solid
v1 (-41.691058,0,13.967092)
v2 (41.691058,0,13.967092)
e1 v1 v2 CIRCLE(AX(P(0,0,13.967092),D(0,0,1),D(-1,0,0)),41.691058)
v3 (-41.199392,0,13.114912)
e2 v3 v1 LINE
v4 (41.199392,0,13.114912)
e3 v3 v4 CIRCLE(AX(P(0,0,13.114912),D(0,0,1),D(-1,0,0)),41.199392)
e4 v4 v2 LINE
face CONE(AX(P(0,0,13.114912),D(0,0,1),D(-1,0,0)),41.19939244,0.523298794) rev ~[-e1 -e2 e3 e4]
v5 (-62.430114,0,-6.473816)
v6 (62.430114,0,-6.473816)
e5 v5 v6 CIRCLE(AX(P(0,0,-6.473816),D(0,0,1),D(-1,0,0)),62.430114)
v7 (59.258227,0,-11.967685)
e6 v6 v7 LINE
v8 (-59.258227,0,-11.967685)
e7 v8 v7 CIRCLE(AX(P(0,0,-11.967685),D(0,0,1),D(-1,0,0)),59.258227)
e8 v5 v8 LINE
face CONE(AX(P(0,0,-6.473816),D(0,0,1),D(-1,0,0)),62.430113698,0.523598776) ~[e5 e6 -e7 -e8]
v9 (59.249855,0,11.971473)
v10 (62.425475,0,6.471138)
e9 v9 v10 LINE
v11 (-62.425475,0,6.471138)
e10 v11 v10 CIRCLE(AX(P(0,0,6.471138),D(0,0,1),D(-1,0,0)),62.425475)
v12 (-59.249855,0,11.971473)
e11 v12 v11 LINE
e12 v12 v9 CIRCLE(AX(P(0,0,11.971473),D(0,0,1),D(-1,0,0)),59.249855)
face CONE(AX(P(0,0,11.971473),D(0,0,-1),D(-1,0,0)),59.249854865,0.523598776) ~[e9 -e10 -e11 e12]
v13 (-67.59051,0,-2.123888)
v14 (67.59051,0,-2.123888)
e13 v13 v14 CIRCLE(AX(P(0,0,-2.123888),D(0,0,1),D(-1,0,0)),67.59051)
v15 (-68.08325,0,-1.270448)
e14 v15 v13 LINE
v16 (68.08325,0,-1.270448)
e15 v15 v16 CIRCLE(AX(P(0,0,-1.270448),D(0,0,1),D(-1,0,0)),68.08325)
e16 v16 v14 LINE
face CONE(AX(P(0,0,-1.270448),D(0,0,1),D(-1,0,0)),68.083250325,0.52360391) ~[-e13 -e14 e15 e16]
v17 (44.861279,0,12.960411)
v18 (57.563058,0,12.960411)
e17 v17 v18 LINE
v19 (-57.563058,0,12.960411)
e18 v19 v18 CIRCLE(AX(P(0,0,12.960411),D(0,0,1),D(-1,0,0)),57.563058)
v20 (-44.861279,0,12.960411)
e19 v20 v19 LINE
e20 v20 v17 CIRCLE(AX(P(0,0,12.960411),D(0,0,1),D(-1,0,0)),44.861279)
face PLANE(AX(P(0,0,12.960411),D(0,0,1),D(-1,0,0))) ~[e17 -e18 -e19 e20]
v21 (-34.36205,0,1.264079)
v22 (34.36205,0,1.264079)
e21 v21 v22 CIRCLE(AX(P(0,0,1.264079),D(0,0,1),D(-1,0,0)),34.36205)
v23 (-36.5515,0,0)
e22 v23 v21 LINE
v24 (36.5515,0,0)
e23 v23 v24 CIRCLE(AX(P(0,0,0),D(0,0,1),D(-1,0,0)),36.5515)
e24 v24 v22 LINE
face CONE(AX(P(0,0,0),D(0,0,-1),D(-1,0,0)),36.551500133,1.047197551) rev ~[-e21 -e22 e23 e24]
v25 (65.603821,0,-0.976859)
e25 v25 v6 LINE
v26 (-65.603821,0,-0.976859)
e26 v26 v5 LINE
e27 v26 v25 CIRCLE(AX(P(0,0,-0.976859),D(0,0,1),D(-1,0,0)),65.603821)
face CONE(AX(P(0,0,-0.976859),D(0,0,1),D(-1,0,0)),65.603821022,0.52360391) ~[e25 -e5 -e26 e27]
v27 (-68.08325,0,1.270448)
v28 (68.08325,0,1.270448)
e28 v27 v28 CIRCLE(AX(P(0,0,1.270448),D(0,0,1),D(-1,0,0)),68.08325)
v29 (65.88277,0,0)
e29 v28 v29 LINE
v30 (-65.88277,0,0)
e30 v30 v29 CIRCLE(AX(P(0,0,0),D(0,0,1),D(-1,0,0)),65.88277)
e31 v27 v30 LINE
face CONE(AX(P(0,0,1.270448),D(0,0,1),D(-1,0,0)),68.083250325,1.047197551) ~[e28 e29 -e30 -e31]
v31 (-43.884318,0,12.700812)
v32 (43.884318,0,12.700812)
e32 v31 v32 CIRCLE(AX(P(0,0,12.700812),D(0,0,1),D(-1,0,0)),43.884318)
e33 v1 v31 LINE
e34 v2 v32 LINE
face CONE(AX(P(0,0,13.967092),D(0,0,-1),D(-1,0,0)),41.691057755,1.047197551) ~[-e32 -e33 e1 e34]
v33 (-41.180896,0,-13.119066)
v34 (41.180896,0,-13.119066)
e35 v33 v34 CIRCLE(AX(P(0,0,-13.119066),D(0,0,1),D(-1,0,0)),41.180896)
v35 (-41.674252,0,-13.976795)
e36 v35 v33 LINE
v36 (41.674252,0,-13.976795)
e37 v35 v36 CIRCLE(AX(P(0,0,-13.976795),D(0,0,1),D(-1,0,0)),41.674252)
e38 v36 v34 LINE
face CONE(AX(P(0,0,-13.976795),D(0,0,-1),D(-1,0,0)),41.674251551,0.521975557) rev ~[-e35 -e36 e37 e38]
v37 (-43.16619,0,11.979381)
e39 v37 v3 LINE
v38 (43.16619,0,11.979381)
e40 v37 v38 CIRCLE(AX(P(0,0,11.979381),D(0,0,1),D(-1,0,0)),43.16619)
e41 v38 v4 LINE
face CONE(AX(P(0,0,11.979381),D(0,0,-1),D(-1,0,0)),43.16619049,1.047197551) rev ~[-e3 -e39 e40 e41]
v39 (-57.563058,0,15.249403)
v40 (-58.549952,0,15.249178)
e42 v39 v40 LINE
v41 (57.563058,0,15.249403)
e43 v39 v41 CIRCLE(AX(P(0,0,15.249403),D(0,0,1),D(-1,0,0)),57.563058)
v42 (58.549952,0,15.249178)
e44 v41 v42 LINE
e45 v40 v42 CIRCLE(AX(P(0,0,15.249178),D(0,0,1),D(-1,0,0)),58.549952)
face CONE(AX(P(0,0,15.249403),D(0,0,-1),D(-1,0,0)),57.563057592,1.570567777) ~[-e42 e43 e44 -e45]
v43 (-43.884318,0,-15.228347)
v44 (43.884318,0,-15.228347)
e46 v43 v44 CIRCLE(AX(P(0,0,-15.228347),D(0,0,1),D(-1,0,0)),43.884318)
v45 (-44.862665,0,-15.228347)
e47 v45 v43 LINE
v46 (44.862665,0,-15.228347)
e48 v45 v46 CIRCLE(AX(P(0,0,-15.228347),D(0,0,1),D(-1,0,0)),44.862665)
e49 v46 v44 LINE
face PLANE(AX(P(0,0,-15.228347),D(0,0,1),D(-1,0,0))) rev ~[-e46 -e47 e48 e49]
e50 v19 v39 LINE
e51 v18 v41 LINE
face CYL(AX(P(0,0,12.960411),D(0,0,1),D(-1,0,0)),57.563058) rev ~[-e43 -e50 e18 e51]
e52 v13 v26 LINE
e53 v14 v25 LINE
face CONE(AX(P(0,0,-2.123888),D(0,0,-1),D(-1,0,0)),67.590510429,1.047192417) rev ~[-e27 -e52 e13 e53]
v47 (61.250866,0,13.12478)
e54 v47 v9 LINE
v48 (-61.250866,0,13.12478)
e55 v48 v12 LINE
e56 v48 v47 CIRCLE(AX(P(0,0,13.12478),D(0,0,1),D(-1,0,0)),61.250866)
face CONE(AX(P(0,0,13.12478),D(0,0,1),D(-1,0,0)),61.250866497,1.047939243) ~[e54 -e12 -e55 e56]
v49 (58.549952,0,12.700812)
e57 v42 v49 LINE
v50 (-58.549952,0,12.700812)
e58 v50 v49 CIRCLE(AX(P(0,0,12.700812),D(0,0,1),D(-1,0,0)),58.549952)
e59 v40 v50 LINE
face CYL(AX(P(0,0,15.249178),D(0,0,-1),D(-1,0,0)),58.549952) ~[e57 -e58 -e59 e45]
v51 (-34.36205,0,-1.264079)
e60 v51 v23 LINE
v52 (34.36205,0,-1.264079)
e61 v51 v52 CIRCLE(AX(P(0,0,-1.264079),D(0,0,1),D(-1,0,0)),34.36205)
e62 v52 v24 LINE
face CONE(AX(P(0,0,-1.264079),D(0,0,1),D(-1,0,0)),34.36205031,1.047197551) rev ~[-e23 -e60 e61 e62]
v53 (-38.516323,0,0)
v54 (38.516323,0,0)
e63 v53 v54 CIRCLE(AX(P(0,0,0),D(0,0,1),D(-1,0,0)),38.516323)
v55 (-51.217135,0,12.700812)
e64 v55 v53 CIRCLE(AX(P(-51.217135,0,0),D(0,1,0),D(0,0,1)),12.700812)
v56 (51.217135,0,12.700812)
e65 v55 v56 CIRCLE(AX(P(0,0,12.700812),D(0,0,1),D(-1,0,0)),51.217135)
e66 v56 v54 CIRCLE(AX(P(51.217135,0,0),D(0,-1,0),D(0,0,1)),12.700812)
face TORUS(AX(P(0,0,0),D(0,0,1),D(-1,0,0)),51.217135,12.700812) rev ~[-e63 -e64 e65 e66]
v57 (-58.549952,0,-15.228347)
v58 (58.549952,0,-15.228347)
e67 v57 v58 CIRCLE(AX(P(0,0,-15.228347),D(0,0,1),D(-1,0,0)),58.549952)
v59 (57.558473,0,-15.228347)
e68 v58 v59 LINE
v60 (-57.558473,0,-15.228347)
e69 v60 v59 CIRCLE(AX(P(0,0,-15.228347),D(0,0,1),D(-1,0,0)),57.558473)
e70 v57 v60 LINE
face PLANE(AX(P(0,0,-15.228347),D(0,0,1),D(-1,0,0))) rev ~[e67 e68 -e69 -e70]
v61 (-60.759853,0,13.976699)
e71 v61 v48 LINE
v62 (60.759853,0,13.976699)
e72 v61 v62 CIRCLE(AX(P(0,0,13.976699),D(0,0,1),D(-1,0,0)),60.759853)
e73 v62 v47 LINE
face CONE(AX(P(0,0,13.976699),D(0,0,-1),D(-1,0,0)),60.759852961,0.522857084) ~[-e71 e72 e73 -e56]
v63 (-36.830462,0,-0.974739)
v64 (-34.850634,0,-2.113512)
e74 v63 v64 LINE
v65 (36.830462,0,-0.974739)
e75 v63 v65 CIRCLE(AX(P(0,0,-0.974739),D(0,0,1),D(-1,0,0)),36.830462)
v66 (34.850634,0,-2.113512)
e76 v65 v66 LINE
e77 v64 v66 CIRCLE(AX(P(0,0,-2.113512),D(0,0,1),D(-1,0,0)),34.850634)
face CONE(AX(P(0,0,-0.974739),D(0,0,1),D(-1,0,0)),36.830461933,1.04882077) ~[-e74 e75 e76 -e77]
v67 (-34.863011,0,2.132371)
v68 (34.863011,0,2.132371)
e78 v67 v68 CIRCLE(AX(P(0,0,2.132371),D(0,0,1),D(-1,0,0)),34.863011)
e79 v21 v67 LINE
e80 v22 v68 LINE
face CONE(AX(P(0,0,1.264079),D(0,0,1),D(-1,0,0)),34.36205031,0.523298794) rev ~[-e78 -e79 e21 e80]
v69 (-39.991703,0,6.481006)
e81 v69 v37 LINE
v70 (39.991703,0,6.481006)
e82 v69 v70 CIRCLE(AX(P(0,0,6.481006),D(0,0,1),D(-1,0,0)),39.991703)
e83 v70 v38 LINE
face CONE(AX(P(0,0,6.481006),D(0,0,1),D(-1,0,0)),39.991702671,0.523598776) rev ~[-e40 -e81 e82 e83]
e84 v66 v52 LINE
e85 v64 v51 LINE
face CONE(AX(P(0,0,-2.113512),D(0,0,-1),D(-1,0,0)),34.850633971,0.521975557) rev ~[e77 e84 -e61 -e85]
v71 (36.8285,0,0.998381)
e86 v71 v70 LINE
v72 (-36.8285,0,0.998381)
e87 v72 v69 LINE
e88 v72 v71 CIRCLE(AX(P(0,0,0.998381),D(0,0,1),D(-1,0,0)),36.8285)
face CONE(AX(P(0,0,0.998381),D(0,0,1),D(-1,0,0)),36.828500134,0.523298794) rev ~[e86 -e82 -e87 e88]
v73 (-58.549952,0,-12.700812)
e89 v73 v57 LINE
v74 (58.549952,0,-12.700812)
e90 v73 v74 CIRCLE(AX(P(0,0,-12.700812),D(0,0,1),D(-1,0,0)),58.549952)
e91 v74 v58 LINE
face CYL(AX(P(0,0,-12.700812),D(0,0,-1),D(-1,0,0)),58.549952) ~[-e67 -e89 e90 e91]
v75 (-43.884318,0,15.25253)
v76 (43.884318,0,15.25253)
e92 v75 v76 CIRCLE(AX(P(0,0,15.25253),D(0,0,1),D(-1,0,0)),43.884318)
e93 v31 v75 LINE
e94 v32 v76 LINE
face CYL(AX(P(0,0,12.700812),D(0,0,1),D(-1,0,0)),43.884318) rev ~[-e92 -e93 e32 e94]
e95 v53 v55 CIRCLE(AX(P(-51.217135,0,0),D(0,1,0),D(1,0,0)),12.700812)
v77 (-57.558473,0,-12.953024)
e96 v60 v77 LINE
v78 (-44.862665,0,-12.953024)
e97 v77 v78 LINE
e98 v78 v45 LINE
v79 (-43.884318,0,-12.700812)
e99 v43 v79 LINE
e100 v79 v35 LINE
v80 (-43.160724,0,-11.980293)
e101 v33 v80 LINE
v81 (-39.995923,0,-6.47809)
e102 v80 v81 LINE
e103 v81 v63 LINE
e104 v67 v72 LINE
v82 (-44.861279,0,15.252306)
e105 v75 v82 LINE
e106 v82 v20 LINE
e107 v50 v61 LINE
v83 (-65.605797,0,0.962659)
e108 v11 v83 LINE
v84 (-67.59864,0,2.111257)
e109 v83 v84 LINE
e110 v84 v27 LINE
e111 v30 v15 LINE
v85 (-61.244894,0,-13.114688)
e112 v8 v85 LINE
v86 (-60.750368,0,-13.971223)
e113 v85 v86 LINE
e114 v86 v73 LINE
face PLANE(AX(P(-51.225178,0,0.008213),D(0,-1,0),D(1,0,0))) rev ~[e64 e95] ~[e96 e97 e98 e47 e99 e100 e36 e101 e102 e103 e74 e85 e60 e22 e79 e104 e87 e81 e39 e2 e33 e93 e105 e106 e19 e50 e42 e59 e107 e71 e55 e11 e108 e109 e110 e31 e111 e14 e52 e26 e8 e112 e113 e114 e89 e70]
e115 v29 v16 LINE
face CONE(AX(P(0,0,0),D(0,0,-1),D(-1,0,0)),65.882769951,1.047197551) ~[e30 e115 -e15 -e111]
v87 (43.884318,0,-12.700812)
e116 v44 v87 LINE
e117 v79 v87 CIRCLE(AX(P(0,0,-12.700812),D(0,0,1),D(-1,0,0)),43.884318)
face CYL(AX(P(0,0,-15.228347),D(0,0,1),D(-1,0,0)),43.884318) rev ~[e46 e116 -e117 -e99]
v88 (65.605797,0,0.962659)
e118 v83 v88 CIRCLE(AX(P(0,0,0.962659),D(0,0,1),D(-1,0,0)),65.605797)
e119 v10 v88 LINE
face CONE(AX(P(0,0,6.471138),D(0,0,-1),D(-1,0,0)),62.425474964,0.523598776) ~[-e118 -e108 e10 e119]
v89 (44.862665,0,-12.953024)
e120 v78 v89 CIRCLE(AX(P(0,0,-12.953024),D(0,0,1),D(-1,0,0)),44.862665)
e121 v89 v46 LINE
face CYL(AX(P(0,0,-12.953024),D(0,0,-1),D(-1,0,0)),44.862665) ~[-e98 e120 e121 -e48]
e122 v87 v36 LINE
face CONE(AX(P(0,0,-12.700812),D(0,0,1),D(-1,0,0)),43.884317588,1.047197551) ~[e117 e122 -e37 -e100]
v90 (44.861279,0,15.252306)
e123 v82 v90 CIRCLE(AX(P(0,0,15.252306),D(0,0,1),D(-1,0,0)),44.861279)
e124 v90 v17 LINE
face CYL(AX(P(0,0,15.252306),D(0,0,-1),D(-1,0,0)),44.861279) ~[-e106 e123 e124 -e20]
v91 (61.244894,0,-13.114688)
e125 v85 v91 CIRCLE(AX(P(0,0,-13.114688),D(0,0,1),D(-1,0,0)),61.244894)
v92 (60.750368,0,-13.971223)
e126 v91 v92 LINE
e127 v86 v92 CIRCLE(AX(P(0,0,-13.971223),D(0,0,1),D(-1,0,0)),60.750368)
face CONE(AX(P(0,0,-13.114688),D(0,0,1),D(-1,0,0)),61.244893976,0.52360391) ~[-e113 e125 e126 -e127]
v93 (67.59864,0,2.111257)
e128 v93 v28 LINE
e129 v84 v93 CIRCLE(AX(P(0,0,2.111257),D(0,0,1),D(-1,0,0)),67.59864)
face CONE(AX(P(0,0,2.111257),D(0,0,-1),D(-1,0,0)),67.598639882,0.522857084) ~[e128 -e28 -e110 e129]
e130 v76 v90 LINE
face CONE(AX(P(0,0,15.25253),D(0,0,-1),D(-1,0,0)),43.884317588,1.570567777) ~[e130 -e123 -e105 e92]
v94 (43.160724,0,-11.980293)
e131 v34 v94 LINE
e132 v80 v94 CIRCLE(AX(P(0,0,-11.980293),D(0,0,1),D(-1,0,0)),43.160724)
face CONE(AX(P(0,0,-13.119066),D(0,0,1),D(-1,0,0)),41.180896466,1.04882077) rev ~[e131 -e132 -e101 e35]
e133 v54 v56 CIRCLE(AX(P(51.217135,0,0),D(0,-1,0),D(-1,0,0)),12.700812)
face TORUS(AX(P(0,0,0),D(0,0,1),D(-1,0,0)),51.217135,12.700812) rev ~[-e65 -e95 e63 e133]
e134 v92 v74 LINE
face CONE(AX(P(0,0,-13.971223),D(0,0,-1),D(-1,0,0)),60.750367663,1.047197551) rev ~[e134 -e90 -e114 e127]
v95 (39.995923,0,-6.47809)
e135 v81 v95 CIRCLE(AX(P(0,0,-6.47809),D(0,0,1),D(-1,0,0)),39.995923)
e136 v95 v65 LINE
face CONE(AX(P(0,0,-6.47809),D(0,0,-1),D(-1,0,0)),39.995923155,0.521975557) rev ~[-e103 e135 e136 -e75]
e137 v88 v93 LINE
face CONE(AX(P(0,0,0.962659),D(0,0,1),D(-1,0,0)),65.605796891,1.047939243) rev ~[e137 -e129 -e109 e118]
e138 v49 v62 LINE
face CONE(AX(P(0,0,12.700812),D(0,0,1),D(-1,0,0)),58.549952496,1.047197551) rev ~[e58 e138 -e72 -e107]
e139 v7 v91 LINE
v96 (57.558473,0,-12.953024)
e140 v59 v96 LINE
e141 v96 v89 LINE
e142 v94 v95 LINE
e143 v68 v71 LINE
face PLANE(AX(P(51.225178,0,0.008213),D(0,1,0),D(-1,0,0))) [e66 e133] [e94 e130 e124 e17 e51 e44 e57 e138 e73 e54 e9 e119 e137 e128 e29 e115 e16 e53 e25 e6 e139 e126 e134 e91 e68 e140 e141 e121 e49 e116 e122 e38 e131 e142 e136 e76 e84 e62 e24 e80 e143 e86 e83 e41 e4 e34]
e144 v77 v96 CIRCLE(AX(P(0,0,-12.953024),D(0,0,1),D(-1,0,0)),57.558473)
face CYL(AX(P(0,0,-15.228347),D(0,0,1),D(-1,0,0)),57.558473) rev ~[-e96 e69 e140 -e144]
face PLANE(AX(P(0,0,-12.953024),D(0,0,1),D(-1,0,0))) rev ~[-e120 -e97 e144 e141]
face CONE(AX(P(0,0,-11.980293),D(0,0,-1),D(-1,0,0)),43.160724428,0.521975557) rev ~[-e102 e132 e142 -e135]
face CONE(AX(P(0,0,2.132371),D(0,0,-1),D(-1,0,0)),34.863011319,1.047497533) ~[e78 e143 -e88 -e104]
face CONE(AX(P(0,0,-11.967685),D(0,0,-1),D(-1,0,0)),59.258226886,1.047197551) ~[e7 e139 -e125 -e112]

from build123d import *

# Parameters (mm, degrees)
F2_ANGLE = 180


with BuildPart() as f2:
    # F1 (on Front) → F2 (revolve)
    with BuildSketch(Plane.XZ):
        Polygon((-68.0832503253, 1.2704479365), (-65.8827699508, 0), (-68.0832503253, -1.2704479365), (-67.590510429, -2.1238883528), (-65.6038210217, -0.9768590888), (-62.4301136979, -6.4738162454), (-59.2582268861, -11.9676853595), (-61.244893976, -13.1146881387), (-60.7503676631, -13.9712226825), (-58.5499524964, -12.7008123937), (-58.5499524964, -15.2283469215), (-57.5584731996, -15.2283469215), (-57.5584731996, -12.9530243576), (-51.217135042, -12.9530243576), (-44.862665236, -12.9530243576), (-44.862665236, -15.2283469215), (-43.8843175875, -15.2283469215), (-43.8843175875, -12.7008123937), (-41.6742515512, -13.9767946147), (-41.1808964662, -13.1190662144), (-43.1607244284, -11.9802929242), (-39.9959231548, -6.4780897113), (-36.8304619331, -0.9747391376), (-34.850633971, -2.1135124278), (-34.3620503103, -1.2640794445), (-36.5515001331, 0), (-34.3620503103, 1.2640794445), (-34.8630113186, 2.1323707922), (-36.8285001335, 0.9983813071), (-39.9917026714, 6.4810064009), (-43.1661904902, 11.9793805911), (-41.19939244, 13.1149119748), (-41.6910577545, 13.9670915487), (-43.8843175875, 12.7008123937), (-43.8843175875, 15.2525296435), (-44.861279428, 15.2523063589), (-44.861279428, 12.9604106769), (-51.217135042, 12.9604106769), (-57.5630575919, 12.9604106769), (-57.5630575919, 15.2494033683), (-58.5499524964, 15.2491778135), (-58.5499524964, 12.7008123937), (-60.7598529608, 13.9766990217), (-61.2508664965, 13.1247800337), (-59.2498548651, 11.9714734282), (-62.425474964, 6.4711380712), (-65.6057968908, 0.9626589096), (-67.5986398816, 2.1112574229), align=None)
        with BuildLine():
            ThreePointArc((-51.217135042, 12.7008123937), (-42.2363044718, 8.9808305702), (-38.5163226482, 0))
            ThreePointArc((-38.5163226482, 0), (-60.1979656121, -8.9808305702), (-51.217135042, 12.7008123937))
        make_face(mode=Mode.SUBTRACT)
    revolve(axis=Axis((0, 0, 0), (0, 0, 1)), revolution_arc=F2_ANGLE)


solid = f2.part
